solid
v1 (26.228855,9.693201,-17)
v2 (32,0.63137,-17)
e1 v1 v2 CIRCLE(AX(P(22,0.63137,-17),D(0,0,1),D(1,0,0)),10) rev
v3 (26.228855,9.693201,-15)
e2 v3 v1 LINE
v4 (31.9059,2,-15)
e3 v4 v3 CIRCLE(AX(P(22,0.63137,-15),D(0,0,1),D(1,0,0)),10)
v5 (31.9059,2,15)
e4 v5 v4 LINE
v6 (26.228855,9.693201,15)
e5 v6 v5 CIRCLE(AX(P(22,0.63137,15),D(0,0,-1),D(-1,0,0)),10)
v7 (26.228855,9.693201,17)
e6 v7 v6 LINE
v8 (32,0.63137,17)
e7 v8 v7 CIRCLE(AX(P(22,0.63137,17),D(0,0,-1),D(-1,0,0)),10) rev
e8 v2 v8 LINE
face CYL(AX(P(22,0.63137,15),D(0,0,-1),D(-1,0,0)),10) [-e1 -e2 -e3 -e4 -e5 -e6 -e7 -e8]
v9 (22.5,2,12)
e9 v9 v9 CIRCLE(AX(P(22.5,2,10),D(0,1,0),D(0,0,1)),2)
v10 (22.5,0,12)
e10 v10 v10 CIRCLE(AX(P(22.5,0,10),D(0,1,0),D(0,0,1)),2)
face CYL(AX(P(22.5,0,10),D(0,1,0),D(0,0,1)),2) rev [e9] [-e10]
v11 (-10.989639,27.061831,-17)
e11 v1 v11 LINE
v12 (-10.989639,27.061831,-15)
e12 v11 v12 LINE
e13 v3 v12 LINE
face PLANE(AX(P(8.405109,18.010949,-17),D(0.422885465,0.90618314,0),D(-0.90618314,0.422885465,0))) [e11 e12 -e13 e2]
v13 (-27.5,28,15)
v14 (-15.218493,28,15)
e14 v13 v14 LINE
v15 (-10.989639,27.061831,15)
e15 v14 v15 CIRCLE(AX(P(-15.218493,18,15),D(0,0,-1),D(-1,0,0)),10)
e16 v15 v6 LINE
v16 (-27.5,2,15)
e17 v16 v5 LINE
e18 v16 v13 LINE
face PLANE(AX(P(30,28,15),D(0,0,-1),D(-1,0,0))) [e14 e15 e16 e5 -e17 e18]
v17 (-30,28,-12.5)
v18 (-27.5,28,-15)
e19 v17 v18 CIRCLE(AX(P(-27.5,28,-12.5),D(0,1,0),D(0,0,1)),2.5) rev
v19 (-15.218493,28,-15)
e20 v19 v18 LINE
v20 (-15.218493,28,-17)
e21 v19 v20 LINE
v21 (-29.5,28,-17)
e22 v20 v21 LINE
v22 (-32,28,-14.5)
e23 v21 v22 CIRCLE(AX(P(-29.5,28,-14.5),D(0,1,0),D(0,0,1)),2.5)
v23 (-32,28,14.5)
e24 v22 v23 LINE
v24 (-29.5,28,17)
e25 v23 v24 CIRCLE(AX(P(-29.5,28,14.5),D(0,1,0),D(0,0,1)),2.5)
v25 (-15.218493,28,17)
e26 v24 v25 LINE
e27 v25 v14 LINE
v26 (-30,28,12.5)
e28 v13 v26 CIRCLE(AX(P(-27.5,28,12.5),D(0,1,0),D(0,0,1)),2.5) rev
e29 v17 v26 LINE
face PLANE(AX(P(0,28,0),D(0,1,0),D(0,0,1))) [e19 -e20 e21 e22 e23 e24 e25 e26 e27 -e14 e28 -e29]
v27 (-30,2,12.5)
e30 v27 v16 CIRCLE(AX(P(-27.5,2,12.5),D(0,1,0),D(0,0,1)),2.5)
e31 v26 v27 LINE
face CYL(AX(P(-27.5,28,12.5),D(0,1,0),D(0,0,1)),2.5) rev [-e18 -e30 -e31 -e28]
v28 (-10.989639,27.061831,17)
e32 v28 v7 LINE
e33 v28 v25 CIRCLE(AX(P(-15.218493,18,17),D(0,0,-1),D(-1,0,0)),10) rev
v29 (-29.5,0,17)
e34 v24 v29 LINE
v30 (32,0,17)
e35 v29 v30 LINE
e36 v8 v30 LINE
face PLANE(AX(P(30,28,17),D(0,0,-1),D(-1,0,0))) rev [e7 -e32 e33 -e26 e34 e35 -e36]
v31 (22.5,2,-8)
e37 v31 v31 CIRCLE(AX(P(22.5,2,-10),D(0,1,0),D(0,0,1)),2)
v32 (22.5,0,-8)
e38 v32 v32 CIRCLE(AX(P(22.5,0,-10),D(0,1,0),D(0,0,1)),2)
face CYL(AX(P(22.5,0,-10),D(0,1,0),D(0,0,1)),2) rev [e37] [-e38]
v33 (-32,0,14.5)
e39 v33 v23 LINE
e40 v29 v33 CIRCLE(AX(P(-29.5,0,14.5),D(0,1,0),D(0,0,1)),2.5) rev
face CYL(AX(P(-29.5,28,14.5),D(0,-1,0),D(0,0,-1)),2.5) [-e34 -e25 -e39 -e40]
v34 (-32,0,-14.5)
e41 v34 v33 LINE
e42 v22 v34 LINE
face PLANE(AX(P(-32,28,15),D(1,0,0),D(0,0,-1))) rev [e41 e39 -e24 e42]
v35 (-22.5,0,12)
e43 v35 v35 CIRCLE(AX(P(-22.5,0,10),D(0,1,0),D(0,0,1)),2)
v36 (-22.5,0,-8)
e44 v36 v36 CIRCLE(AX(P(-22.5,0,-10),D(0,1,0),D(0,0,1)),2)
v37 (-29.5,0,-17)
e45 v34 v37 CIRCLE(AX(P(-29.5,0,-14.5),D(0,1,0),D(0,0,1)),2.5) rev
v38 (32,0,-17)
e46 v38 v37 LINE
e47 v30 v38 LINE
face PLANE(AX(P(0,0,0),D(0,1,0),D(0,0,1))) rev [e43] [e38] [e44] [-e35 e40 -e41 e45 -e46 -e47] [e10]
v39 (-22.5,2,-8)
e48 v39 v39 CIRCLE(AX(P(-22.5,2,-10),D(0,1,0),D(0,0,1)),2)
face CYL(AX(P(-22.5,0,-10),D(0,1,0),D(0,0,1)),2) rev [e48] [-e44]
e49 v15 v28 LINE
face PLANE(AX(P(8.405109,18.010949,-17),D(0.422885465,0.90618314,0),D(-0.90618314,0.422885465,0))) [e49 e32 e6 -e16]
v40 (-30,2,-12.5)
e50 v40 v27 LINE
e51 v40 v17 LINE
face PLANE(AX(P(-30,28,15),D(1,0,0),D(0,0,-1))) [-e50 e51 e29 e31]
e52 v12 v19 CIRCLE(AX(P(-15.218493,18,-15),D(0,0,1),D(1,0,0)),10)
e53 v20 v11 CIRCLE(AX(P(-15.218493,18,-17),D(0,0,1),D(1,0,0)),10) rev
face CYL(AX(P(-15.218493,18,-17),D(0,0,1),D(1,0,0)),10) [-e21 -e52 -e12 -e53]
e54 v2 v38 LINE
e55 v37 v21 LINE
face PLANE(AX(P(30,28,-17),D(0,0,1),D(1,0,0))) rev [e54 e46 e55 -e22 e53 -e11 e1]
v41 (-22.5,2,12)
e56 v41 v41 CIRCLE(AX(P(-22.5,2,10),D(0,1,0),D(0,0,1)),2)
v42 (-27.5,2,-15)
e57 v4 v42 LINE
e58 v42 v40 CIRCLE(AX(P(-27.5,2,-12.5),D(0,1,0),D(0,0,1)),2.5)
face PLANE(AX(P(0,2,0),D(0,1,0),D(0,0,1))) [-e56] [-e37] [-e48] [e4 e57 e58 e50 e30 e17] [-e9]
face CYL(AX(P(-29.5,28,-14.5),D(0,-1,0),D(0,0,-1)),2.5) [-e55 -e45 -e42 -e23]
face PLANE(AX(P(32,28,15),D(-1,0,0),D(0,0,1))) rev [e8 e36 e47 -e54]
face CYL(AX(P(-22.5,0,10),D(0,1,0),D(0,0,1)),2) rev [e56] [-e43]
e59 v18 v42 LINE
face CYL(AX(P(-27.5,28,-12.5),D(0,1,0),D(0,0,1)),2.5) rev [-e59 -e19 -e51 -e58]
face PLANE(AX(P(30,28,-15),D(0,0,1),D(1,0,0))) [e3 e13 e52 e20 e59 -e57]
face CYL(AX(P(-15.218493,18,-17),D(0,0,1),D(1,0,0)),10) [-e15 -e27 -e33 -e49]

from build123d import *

# Parameters (mm, degrees)
SKETCH_1_W               = 64
SKETCH_1_H               = 34
SKETCH_1_W_2             = 60
SKETCH_1_H_2             = 30
EXTRUDE_1_DEPTH          = 28
SKETCH_1_2_W             = 60
SKETCH_1_2_H             = 30
EXTRUDE_1_2_DEPTH        = 2
FILLET_3_R               = 2.5
CUT_EXTRUDE_6_DEPTH      = 55.442630355
CUT_EXTRUDE_6_DEPTH_BACK = 55.442630355
FILLET_4_R               = 10
SKETCH_8_W               = 30
SKETCH_8_H               = 4.631369762
CUT_EXTRUDE_7_DEPTH      = 71.121323433
CUT_EXTRUDE_9_DEPTH      = 45.598206242
CUT_EXTRUDE_9_DEPTH_BACK = 45.598206242
SKETCH_9_R               = 2


with BuildPart() as part:
    # Эскиз1 → Extrude 1 (new body)
    with BuildSketch(Plane(origin=(0, 0, 0), x_dir=(1, 0, 0), z_dir=(0, 1, 0))):
        Rectangle(SKETCH_1_W, SKETCH_1_H)
        Rectangle(SKETCH_1_W_2, SKETCH_1_H_2, mode=Mode.SUBTRACT)
    extrude(amount=EXTRUDE_1_DEPTH)

    # Эскиз1<2> → Extrude 1 2 (add)
    with BuildSketch(Plane(origin=(0, 0, 0), x_dir=(1, 0, 0), z_dir=(0, 1, 0))):
        Rectangle(SKETCH_1_2_W, SKETCH_1_2_H)
    extrude(amount=EXTRUDE_1_2_DEPTH)

    # Скругление3
    fillet_3_edges = [part.edges().sort_by_distance(p)[0] for p in [
        (-30, 15, -15),
        (-30, 15, 15),
        (-32, 14, -17),
        (-32, 14, 17),
    ]]
    fillet(fillet_3_edges, radius=FILLET_3_R)

    # Эскиз3 → Вырез-Вытянуть6 (cut, two sides: drawn at the far end of the back side and taken through both)
    with BuildSketch(Plane.XY.offset(17).offset(-CUT_EXTRUDE_6_DEPTH_BACK)):
        Polygon((-13, 28), (32, 7), (32, 28), align=None)
    extrude(amount=CUT_EXTRUDE_6_DEPTH + CUT_EXTRUDE_6_DEPTH_BACK, mode=Mode.SUBTRACT)

    # Скругление4
    # the kernel refuses this fillet: 10 mm, written as the material it takes off along each edge
    with BuildSketch(Plane(origin=(32, 7, -32.921575595), x_dir=(0, -1, 0), z_dir=(0, 0, 1))) as fillet_4_piece_1:
        with BuildLine():
            CenterArc((FILLET_4_R * 0.636863023816, -FILLET_4_R), FILLET_4_R, 90, 64.983106522)
            Line((-FILLET_4_R * 0.269320116179, -FILLET_4_R * 0.577114534669), (0, 0))
            Line((0, 0), (FILLET_4_R * 0.636863023816, 0))
        make_face()
    extrude(amount=65.843151191, mode=Mode.SUBTRACT)
    with BuildSketch(Plane(origin=(-13, 28, 22.546233419), x_dir=(0.9061831399952657, -0.4228854653311234, 0), z_dir=(0, 0, -1)), Plane(origin=(-13, 28, -9.453766581), x_dir=(0.9061831399952657, -0.4228854653311234, 0), z_dir=(0, 0, -1))) as fillet_4_piece_2:
        with BuildLine():
            CenterArc((FILLET_4_R * 0.22184933675, FILLET_4_R), FILLET_4_R, 244.983106522, 25.016893478)
            Line((-FILLET_4_R * 0.201036128582, FILLET_4_R * 0.0938168600047), (0, 0))
            Line((0, 0), (FILLET_4_R * 0.22184933675, 0))
        make_face()
    extrude(amount=13.092466837, mode=Mode.SUBTRACT)

    # Эскиз8 → Вырез-Вытянуть7 (cut, through all)
    with BuildSketch(Plane.ZY.offset(-30)):
        with Locations((0, 4.315684881)):
            Rectangle(SKETCH_8_W, SKETCH_8_H)
    extrude(amount=-CUT_EXTRUDE_7_DEPTH, mode=Mode.SUBTRACT)

    # Эскиз9 → Вырез-Вытянуть9 (cut, two sides: drawn at the far end of the back side and taken through both)
    with BuildSketch(Plane(origin=(0, 2, 0), x_dir=(1, 0, 0), z_dir=(0, 1, 0)).offset(-CUT_EXTRUDE_9_DEPTH_BACK)):
        with Locations(Location((-22.5, -10, 0), (0, 0, 270))):
            Circle(SKETCH_9_R)
        with Locations(Location((-22.5, 10, 0), (0, 0, 270))):
            Circle(SKETCH_9_R)
        with Locations(Location((22.5, 10, 0), (0, 0, 270))):
            Circle(SKETCH_9_R)
        with Locations(Location((22.5, -10, 0), (0, 0, 270))):
            Circle(SKETCH_9_R)
    extrude(amount=CUT_EXTRUDE_9_DEPTH + CUT_EXTRUDE_9_DEPTH_BACK, mode=Mode.SUBTRACT)


solid = part.part
